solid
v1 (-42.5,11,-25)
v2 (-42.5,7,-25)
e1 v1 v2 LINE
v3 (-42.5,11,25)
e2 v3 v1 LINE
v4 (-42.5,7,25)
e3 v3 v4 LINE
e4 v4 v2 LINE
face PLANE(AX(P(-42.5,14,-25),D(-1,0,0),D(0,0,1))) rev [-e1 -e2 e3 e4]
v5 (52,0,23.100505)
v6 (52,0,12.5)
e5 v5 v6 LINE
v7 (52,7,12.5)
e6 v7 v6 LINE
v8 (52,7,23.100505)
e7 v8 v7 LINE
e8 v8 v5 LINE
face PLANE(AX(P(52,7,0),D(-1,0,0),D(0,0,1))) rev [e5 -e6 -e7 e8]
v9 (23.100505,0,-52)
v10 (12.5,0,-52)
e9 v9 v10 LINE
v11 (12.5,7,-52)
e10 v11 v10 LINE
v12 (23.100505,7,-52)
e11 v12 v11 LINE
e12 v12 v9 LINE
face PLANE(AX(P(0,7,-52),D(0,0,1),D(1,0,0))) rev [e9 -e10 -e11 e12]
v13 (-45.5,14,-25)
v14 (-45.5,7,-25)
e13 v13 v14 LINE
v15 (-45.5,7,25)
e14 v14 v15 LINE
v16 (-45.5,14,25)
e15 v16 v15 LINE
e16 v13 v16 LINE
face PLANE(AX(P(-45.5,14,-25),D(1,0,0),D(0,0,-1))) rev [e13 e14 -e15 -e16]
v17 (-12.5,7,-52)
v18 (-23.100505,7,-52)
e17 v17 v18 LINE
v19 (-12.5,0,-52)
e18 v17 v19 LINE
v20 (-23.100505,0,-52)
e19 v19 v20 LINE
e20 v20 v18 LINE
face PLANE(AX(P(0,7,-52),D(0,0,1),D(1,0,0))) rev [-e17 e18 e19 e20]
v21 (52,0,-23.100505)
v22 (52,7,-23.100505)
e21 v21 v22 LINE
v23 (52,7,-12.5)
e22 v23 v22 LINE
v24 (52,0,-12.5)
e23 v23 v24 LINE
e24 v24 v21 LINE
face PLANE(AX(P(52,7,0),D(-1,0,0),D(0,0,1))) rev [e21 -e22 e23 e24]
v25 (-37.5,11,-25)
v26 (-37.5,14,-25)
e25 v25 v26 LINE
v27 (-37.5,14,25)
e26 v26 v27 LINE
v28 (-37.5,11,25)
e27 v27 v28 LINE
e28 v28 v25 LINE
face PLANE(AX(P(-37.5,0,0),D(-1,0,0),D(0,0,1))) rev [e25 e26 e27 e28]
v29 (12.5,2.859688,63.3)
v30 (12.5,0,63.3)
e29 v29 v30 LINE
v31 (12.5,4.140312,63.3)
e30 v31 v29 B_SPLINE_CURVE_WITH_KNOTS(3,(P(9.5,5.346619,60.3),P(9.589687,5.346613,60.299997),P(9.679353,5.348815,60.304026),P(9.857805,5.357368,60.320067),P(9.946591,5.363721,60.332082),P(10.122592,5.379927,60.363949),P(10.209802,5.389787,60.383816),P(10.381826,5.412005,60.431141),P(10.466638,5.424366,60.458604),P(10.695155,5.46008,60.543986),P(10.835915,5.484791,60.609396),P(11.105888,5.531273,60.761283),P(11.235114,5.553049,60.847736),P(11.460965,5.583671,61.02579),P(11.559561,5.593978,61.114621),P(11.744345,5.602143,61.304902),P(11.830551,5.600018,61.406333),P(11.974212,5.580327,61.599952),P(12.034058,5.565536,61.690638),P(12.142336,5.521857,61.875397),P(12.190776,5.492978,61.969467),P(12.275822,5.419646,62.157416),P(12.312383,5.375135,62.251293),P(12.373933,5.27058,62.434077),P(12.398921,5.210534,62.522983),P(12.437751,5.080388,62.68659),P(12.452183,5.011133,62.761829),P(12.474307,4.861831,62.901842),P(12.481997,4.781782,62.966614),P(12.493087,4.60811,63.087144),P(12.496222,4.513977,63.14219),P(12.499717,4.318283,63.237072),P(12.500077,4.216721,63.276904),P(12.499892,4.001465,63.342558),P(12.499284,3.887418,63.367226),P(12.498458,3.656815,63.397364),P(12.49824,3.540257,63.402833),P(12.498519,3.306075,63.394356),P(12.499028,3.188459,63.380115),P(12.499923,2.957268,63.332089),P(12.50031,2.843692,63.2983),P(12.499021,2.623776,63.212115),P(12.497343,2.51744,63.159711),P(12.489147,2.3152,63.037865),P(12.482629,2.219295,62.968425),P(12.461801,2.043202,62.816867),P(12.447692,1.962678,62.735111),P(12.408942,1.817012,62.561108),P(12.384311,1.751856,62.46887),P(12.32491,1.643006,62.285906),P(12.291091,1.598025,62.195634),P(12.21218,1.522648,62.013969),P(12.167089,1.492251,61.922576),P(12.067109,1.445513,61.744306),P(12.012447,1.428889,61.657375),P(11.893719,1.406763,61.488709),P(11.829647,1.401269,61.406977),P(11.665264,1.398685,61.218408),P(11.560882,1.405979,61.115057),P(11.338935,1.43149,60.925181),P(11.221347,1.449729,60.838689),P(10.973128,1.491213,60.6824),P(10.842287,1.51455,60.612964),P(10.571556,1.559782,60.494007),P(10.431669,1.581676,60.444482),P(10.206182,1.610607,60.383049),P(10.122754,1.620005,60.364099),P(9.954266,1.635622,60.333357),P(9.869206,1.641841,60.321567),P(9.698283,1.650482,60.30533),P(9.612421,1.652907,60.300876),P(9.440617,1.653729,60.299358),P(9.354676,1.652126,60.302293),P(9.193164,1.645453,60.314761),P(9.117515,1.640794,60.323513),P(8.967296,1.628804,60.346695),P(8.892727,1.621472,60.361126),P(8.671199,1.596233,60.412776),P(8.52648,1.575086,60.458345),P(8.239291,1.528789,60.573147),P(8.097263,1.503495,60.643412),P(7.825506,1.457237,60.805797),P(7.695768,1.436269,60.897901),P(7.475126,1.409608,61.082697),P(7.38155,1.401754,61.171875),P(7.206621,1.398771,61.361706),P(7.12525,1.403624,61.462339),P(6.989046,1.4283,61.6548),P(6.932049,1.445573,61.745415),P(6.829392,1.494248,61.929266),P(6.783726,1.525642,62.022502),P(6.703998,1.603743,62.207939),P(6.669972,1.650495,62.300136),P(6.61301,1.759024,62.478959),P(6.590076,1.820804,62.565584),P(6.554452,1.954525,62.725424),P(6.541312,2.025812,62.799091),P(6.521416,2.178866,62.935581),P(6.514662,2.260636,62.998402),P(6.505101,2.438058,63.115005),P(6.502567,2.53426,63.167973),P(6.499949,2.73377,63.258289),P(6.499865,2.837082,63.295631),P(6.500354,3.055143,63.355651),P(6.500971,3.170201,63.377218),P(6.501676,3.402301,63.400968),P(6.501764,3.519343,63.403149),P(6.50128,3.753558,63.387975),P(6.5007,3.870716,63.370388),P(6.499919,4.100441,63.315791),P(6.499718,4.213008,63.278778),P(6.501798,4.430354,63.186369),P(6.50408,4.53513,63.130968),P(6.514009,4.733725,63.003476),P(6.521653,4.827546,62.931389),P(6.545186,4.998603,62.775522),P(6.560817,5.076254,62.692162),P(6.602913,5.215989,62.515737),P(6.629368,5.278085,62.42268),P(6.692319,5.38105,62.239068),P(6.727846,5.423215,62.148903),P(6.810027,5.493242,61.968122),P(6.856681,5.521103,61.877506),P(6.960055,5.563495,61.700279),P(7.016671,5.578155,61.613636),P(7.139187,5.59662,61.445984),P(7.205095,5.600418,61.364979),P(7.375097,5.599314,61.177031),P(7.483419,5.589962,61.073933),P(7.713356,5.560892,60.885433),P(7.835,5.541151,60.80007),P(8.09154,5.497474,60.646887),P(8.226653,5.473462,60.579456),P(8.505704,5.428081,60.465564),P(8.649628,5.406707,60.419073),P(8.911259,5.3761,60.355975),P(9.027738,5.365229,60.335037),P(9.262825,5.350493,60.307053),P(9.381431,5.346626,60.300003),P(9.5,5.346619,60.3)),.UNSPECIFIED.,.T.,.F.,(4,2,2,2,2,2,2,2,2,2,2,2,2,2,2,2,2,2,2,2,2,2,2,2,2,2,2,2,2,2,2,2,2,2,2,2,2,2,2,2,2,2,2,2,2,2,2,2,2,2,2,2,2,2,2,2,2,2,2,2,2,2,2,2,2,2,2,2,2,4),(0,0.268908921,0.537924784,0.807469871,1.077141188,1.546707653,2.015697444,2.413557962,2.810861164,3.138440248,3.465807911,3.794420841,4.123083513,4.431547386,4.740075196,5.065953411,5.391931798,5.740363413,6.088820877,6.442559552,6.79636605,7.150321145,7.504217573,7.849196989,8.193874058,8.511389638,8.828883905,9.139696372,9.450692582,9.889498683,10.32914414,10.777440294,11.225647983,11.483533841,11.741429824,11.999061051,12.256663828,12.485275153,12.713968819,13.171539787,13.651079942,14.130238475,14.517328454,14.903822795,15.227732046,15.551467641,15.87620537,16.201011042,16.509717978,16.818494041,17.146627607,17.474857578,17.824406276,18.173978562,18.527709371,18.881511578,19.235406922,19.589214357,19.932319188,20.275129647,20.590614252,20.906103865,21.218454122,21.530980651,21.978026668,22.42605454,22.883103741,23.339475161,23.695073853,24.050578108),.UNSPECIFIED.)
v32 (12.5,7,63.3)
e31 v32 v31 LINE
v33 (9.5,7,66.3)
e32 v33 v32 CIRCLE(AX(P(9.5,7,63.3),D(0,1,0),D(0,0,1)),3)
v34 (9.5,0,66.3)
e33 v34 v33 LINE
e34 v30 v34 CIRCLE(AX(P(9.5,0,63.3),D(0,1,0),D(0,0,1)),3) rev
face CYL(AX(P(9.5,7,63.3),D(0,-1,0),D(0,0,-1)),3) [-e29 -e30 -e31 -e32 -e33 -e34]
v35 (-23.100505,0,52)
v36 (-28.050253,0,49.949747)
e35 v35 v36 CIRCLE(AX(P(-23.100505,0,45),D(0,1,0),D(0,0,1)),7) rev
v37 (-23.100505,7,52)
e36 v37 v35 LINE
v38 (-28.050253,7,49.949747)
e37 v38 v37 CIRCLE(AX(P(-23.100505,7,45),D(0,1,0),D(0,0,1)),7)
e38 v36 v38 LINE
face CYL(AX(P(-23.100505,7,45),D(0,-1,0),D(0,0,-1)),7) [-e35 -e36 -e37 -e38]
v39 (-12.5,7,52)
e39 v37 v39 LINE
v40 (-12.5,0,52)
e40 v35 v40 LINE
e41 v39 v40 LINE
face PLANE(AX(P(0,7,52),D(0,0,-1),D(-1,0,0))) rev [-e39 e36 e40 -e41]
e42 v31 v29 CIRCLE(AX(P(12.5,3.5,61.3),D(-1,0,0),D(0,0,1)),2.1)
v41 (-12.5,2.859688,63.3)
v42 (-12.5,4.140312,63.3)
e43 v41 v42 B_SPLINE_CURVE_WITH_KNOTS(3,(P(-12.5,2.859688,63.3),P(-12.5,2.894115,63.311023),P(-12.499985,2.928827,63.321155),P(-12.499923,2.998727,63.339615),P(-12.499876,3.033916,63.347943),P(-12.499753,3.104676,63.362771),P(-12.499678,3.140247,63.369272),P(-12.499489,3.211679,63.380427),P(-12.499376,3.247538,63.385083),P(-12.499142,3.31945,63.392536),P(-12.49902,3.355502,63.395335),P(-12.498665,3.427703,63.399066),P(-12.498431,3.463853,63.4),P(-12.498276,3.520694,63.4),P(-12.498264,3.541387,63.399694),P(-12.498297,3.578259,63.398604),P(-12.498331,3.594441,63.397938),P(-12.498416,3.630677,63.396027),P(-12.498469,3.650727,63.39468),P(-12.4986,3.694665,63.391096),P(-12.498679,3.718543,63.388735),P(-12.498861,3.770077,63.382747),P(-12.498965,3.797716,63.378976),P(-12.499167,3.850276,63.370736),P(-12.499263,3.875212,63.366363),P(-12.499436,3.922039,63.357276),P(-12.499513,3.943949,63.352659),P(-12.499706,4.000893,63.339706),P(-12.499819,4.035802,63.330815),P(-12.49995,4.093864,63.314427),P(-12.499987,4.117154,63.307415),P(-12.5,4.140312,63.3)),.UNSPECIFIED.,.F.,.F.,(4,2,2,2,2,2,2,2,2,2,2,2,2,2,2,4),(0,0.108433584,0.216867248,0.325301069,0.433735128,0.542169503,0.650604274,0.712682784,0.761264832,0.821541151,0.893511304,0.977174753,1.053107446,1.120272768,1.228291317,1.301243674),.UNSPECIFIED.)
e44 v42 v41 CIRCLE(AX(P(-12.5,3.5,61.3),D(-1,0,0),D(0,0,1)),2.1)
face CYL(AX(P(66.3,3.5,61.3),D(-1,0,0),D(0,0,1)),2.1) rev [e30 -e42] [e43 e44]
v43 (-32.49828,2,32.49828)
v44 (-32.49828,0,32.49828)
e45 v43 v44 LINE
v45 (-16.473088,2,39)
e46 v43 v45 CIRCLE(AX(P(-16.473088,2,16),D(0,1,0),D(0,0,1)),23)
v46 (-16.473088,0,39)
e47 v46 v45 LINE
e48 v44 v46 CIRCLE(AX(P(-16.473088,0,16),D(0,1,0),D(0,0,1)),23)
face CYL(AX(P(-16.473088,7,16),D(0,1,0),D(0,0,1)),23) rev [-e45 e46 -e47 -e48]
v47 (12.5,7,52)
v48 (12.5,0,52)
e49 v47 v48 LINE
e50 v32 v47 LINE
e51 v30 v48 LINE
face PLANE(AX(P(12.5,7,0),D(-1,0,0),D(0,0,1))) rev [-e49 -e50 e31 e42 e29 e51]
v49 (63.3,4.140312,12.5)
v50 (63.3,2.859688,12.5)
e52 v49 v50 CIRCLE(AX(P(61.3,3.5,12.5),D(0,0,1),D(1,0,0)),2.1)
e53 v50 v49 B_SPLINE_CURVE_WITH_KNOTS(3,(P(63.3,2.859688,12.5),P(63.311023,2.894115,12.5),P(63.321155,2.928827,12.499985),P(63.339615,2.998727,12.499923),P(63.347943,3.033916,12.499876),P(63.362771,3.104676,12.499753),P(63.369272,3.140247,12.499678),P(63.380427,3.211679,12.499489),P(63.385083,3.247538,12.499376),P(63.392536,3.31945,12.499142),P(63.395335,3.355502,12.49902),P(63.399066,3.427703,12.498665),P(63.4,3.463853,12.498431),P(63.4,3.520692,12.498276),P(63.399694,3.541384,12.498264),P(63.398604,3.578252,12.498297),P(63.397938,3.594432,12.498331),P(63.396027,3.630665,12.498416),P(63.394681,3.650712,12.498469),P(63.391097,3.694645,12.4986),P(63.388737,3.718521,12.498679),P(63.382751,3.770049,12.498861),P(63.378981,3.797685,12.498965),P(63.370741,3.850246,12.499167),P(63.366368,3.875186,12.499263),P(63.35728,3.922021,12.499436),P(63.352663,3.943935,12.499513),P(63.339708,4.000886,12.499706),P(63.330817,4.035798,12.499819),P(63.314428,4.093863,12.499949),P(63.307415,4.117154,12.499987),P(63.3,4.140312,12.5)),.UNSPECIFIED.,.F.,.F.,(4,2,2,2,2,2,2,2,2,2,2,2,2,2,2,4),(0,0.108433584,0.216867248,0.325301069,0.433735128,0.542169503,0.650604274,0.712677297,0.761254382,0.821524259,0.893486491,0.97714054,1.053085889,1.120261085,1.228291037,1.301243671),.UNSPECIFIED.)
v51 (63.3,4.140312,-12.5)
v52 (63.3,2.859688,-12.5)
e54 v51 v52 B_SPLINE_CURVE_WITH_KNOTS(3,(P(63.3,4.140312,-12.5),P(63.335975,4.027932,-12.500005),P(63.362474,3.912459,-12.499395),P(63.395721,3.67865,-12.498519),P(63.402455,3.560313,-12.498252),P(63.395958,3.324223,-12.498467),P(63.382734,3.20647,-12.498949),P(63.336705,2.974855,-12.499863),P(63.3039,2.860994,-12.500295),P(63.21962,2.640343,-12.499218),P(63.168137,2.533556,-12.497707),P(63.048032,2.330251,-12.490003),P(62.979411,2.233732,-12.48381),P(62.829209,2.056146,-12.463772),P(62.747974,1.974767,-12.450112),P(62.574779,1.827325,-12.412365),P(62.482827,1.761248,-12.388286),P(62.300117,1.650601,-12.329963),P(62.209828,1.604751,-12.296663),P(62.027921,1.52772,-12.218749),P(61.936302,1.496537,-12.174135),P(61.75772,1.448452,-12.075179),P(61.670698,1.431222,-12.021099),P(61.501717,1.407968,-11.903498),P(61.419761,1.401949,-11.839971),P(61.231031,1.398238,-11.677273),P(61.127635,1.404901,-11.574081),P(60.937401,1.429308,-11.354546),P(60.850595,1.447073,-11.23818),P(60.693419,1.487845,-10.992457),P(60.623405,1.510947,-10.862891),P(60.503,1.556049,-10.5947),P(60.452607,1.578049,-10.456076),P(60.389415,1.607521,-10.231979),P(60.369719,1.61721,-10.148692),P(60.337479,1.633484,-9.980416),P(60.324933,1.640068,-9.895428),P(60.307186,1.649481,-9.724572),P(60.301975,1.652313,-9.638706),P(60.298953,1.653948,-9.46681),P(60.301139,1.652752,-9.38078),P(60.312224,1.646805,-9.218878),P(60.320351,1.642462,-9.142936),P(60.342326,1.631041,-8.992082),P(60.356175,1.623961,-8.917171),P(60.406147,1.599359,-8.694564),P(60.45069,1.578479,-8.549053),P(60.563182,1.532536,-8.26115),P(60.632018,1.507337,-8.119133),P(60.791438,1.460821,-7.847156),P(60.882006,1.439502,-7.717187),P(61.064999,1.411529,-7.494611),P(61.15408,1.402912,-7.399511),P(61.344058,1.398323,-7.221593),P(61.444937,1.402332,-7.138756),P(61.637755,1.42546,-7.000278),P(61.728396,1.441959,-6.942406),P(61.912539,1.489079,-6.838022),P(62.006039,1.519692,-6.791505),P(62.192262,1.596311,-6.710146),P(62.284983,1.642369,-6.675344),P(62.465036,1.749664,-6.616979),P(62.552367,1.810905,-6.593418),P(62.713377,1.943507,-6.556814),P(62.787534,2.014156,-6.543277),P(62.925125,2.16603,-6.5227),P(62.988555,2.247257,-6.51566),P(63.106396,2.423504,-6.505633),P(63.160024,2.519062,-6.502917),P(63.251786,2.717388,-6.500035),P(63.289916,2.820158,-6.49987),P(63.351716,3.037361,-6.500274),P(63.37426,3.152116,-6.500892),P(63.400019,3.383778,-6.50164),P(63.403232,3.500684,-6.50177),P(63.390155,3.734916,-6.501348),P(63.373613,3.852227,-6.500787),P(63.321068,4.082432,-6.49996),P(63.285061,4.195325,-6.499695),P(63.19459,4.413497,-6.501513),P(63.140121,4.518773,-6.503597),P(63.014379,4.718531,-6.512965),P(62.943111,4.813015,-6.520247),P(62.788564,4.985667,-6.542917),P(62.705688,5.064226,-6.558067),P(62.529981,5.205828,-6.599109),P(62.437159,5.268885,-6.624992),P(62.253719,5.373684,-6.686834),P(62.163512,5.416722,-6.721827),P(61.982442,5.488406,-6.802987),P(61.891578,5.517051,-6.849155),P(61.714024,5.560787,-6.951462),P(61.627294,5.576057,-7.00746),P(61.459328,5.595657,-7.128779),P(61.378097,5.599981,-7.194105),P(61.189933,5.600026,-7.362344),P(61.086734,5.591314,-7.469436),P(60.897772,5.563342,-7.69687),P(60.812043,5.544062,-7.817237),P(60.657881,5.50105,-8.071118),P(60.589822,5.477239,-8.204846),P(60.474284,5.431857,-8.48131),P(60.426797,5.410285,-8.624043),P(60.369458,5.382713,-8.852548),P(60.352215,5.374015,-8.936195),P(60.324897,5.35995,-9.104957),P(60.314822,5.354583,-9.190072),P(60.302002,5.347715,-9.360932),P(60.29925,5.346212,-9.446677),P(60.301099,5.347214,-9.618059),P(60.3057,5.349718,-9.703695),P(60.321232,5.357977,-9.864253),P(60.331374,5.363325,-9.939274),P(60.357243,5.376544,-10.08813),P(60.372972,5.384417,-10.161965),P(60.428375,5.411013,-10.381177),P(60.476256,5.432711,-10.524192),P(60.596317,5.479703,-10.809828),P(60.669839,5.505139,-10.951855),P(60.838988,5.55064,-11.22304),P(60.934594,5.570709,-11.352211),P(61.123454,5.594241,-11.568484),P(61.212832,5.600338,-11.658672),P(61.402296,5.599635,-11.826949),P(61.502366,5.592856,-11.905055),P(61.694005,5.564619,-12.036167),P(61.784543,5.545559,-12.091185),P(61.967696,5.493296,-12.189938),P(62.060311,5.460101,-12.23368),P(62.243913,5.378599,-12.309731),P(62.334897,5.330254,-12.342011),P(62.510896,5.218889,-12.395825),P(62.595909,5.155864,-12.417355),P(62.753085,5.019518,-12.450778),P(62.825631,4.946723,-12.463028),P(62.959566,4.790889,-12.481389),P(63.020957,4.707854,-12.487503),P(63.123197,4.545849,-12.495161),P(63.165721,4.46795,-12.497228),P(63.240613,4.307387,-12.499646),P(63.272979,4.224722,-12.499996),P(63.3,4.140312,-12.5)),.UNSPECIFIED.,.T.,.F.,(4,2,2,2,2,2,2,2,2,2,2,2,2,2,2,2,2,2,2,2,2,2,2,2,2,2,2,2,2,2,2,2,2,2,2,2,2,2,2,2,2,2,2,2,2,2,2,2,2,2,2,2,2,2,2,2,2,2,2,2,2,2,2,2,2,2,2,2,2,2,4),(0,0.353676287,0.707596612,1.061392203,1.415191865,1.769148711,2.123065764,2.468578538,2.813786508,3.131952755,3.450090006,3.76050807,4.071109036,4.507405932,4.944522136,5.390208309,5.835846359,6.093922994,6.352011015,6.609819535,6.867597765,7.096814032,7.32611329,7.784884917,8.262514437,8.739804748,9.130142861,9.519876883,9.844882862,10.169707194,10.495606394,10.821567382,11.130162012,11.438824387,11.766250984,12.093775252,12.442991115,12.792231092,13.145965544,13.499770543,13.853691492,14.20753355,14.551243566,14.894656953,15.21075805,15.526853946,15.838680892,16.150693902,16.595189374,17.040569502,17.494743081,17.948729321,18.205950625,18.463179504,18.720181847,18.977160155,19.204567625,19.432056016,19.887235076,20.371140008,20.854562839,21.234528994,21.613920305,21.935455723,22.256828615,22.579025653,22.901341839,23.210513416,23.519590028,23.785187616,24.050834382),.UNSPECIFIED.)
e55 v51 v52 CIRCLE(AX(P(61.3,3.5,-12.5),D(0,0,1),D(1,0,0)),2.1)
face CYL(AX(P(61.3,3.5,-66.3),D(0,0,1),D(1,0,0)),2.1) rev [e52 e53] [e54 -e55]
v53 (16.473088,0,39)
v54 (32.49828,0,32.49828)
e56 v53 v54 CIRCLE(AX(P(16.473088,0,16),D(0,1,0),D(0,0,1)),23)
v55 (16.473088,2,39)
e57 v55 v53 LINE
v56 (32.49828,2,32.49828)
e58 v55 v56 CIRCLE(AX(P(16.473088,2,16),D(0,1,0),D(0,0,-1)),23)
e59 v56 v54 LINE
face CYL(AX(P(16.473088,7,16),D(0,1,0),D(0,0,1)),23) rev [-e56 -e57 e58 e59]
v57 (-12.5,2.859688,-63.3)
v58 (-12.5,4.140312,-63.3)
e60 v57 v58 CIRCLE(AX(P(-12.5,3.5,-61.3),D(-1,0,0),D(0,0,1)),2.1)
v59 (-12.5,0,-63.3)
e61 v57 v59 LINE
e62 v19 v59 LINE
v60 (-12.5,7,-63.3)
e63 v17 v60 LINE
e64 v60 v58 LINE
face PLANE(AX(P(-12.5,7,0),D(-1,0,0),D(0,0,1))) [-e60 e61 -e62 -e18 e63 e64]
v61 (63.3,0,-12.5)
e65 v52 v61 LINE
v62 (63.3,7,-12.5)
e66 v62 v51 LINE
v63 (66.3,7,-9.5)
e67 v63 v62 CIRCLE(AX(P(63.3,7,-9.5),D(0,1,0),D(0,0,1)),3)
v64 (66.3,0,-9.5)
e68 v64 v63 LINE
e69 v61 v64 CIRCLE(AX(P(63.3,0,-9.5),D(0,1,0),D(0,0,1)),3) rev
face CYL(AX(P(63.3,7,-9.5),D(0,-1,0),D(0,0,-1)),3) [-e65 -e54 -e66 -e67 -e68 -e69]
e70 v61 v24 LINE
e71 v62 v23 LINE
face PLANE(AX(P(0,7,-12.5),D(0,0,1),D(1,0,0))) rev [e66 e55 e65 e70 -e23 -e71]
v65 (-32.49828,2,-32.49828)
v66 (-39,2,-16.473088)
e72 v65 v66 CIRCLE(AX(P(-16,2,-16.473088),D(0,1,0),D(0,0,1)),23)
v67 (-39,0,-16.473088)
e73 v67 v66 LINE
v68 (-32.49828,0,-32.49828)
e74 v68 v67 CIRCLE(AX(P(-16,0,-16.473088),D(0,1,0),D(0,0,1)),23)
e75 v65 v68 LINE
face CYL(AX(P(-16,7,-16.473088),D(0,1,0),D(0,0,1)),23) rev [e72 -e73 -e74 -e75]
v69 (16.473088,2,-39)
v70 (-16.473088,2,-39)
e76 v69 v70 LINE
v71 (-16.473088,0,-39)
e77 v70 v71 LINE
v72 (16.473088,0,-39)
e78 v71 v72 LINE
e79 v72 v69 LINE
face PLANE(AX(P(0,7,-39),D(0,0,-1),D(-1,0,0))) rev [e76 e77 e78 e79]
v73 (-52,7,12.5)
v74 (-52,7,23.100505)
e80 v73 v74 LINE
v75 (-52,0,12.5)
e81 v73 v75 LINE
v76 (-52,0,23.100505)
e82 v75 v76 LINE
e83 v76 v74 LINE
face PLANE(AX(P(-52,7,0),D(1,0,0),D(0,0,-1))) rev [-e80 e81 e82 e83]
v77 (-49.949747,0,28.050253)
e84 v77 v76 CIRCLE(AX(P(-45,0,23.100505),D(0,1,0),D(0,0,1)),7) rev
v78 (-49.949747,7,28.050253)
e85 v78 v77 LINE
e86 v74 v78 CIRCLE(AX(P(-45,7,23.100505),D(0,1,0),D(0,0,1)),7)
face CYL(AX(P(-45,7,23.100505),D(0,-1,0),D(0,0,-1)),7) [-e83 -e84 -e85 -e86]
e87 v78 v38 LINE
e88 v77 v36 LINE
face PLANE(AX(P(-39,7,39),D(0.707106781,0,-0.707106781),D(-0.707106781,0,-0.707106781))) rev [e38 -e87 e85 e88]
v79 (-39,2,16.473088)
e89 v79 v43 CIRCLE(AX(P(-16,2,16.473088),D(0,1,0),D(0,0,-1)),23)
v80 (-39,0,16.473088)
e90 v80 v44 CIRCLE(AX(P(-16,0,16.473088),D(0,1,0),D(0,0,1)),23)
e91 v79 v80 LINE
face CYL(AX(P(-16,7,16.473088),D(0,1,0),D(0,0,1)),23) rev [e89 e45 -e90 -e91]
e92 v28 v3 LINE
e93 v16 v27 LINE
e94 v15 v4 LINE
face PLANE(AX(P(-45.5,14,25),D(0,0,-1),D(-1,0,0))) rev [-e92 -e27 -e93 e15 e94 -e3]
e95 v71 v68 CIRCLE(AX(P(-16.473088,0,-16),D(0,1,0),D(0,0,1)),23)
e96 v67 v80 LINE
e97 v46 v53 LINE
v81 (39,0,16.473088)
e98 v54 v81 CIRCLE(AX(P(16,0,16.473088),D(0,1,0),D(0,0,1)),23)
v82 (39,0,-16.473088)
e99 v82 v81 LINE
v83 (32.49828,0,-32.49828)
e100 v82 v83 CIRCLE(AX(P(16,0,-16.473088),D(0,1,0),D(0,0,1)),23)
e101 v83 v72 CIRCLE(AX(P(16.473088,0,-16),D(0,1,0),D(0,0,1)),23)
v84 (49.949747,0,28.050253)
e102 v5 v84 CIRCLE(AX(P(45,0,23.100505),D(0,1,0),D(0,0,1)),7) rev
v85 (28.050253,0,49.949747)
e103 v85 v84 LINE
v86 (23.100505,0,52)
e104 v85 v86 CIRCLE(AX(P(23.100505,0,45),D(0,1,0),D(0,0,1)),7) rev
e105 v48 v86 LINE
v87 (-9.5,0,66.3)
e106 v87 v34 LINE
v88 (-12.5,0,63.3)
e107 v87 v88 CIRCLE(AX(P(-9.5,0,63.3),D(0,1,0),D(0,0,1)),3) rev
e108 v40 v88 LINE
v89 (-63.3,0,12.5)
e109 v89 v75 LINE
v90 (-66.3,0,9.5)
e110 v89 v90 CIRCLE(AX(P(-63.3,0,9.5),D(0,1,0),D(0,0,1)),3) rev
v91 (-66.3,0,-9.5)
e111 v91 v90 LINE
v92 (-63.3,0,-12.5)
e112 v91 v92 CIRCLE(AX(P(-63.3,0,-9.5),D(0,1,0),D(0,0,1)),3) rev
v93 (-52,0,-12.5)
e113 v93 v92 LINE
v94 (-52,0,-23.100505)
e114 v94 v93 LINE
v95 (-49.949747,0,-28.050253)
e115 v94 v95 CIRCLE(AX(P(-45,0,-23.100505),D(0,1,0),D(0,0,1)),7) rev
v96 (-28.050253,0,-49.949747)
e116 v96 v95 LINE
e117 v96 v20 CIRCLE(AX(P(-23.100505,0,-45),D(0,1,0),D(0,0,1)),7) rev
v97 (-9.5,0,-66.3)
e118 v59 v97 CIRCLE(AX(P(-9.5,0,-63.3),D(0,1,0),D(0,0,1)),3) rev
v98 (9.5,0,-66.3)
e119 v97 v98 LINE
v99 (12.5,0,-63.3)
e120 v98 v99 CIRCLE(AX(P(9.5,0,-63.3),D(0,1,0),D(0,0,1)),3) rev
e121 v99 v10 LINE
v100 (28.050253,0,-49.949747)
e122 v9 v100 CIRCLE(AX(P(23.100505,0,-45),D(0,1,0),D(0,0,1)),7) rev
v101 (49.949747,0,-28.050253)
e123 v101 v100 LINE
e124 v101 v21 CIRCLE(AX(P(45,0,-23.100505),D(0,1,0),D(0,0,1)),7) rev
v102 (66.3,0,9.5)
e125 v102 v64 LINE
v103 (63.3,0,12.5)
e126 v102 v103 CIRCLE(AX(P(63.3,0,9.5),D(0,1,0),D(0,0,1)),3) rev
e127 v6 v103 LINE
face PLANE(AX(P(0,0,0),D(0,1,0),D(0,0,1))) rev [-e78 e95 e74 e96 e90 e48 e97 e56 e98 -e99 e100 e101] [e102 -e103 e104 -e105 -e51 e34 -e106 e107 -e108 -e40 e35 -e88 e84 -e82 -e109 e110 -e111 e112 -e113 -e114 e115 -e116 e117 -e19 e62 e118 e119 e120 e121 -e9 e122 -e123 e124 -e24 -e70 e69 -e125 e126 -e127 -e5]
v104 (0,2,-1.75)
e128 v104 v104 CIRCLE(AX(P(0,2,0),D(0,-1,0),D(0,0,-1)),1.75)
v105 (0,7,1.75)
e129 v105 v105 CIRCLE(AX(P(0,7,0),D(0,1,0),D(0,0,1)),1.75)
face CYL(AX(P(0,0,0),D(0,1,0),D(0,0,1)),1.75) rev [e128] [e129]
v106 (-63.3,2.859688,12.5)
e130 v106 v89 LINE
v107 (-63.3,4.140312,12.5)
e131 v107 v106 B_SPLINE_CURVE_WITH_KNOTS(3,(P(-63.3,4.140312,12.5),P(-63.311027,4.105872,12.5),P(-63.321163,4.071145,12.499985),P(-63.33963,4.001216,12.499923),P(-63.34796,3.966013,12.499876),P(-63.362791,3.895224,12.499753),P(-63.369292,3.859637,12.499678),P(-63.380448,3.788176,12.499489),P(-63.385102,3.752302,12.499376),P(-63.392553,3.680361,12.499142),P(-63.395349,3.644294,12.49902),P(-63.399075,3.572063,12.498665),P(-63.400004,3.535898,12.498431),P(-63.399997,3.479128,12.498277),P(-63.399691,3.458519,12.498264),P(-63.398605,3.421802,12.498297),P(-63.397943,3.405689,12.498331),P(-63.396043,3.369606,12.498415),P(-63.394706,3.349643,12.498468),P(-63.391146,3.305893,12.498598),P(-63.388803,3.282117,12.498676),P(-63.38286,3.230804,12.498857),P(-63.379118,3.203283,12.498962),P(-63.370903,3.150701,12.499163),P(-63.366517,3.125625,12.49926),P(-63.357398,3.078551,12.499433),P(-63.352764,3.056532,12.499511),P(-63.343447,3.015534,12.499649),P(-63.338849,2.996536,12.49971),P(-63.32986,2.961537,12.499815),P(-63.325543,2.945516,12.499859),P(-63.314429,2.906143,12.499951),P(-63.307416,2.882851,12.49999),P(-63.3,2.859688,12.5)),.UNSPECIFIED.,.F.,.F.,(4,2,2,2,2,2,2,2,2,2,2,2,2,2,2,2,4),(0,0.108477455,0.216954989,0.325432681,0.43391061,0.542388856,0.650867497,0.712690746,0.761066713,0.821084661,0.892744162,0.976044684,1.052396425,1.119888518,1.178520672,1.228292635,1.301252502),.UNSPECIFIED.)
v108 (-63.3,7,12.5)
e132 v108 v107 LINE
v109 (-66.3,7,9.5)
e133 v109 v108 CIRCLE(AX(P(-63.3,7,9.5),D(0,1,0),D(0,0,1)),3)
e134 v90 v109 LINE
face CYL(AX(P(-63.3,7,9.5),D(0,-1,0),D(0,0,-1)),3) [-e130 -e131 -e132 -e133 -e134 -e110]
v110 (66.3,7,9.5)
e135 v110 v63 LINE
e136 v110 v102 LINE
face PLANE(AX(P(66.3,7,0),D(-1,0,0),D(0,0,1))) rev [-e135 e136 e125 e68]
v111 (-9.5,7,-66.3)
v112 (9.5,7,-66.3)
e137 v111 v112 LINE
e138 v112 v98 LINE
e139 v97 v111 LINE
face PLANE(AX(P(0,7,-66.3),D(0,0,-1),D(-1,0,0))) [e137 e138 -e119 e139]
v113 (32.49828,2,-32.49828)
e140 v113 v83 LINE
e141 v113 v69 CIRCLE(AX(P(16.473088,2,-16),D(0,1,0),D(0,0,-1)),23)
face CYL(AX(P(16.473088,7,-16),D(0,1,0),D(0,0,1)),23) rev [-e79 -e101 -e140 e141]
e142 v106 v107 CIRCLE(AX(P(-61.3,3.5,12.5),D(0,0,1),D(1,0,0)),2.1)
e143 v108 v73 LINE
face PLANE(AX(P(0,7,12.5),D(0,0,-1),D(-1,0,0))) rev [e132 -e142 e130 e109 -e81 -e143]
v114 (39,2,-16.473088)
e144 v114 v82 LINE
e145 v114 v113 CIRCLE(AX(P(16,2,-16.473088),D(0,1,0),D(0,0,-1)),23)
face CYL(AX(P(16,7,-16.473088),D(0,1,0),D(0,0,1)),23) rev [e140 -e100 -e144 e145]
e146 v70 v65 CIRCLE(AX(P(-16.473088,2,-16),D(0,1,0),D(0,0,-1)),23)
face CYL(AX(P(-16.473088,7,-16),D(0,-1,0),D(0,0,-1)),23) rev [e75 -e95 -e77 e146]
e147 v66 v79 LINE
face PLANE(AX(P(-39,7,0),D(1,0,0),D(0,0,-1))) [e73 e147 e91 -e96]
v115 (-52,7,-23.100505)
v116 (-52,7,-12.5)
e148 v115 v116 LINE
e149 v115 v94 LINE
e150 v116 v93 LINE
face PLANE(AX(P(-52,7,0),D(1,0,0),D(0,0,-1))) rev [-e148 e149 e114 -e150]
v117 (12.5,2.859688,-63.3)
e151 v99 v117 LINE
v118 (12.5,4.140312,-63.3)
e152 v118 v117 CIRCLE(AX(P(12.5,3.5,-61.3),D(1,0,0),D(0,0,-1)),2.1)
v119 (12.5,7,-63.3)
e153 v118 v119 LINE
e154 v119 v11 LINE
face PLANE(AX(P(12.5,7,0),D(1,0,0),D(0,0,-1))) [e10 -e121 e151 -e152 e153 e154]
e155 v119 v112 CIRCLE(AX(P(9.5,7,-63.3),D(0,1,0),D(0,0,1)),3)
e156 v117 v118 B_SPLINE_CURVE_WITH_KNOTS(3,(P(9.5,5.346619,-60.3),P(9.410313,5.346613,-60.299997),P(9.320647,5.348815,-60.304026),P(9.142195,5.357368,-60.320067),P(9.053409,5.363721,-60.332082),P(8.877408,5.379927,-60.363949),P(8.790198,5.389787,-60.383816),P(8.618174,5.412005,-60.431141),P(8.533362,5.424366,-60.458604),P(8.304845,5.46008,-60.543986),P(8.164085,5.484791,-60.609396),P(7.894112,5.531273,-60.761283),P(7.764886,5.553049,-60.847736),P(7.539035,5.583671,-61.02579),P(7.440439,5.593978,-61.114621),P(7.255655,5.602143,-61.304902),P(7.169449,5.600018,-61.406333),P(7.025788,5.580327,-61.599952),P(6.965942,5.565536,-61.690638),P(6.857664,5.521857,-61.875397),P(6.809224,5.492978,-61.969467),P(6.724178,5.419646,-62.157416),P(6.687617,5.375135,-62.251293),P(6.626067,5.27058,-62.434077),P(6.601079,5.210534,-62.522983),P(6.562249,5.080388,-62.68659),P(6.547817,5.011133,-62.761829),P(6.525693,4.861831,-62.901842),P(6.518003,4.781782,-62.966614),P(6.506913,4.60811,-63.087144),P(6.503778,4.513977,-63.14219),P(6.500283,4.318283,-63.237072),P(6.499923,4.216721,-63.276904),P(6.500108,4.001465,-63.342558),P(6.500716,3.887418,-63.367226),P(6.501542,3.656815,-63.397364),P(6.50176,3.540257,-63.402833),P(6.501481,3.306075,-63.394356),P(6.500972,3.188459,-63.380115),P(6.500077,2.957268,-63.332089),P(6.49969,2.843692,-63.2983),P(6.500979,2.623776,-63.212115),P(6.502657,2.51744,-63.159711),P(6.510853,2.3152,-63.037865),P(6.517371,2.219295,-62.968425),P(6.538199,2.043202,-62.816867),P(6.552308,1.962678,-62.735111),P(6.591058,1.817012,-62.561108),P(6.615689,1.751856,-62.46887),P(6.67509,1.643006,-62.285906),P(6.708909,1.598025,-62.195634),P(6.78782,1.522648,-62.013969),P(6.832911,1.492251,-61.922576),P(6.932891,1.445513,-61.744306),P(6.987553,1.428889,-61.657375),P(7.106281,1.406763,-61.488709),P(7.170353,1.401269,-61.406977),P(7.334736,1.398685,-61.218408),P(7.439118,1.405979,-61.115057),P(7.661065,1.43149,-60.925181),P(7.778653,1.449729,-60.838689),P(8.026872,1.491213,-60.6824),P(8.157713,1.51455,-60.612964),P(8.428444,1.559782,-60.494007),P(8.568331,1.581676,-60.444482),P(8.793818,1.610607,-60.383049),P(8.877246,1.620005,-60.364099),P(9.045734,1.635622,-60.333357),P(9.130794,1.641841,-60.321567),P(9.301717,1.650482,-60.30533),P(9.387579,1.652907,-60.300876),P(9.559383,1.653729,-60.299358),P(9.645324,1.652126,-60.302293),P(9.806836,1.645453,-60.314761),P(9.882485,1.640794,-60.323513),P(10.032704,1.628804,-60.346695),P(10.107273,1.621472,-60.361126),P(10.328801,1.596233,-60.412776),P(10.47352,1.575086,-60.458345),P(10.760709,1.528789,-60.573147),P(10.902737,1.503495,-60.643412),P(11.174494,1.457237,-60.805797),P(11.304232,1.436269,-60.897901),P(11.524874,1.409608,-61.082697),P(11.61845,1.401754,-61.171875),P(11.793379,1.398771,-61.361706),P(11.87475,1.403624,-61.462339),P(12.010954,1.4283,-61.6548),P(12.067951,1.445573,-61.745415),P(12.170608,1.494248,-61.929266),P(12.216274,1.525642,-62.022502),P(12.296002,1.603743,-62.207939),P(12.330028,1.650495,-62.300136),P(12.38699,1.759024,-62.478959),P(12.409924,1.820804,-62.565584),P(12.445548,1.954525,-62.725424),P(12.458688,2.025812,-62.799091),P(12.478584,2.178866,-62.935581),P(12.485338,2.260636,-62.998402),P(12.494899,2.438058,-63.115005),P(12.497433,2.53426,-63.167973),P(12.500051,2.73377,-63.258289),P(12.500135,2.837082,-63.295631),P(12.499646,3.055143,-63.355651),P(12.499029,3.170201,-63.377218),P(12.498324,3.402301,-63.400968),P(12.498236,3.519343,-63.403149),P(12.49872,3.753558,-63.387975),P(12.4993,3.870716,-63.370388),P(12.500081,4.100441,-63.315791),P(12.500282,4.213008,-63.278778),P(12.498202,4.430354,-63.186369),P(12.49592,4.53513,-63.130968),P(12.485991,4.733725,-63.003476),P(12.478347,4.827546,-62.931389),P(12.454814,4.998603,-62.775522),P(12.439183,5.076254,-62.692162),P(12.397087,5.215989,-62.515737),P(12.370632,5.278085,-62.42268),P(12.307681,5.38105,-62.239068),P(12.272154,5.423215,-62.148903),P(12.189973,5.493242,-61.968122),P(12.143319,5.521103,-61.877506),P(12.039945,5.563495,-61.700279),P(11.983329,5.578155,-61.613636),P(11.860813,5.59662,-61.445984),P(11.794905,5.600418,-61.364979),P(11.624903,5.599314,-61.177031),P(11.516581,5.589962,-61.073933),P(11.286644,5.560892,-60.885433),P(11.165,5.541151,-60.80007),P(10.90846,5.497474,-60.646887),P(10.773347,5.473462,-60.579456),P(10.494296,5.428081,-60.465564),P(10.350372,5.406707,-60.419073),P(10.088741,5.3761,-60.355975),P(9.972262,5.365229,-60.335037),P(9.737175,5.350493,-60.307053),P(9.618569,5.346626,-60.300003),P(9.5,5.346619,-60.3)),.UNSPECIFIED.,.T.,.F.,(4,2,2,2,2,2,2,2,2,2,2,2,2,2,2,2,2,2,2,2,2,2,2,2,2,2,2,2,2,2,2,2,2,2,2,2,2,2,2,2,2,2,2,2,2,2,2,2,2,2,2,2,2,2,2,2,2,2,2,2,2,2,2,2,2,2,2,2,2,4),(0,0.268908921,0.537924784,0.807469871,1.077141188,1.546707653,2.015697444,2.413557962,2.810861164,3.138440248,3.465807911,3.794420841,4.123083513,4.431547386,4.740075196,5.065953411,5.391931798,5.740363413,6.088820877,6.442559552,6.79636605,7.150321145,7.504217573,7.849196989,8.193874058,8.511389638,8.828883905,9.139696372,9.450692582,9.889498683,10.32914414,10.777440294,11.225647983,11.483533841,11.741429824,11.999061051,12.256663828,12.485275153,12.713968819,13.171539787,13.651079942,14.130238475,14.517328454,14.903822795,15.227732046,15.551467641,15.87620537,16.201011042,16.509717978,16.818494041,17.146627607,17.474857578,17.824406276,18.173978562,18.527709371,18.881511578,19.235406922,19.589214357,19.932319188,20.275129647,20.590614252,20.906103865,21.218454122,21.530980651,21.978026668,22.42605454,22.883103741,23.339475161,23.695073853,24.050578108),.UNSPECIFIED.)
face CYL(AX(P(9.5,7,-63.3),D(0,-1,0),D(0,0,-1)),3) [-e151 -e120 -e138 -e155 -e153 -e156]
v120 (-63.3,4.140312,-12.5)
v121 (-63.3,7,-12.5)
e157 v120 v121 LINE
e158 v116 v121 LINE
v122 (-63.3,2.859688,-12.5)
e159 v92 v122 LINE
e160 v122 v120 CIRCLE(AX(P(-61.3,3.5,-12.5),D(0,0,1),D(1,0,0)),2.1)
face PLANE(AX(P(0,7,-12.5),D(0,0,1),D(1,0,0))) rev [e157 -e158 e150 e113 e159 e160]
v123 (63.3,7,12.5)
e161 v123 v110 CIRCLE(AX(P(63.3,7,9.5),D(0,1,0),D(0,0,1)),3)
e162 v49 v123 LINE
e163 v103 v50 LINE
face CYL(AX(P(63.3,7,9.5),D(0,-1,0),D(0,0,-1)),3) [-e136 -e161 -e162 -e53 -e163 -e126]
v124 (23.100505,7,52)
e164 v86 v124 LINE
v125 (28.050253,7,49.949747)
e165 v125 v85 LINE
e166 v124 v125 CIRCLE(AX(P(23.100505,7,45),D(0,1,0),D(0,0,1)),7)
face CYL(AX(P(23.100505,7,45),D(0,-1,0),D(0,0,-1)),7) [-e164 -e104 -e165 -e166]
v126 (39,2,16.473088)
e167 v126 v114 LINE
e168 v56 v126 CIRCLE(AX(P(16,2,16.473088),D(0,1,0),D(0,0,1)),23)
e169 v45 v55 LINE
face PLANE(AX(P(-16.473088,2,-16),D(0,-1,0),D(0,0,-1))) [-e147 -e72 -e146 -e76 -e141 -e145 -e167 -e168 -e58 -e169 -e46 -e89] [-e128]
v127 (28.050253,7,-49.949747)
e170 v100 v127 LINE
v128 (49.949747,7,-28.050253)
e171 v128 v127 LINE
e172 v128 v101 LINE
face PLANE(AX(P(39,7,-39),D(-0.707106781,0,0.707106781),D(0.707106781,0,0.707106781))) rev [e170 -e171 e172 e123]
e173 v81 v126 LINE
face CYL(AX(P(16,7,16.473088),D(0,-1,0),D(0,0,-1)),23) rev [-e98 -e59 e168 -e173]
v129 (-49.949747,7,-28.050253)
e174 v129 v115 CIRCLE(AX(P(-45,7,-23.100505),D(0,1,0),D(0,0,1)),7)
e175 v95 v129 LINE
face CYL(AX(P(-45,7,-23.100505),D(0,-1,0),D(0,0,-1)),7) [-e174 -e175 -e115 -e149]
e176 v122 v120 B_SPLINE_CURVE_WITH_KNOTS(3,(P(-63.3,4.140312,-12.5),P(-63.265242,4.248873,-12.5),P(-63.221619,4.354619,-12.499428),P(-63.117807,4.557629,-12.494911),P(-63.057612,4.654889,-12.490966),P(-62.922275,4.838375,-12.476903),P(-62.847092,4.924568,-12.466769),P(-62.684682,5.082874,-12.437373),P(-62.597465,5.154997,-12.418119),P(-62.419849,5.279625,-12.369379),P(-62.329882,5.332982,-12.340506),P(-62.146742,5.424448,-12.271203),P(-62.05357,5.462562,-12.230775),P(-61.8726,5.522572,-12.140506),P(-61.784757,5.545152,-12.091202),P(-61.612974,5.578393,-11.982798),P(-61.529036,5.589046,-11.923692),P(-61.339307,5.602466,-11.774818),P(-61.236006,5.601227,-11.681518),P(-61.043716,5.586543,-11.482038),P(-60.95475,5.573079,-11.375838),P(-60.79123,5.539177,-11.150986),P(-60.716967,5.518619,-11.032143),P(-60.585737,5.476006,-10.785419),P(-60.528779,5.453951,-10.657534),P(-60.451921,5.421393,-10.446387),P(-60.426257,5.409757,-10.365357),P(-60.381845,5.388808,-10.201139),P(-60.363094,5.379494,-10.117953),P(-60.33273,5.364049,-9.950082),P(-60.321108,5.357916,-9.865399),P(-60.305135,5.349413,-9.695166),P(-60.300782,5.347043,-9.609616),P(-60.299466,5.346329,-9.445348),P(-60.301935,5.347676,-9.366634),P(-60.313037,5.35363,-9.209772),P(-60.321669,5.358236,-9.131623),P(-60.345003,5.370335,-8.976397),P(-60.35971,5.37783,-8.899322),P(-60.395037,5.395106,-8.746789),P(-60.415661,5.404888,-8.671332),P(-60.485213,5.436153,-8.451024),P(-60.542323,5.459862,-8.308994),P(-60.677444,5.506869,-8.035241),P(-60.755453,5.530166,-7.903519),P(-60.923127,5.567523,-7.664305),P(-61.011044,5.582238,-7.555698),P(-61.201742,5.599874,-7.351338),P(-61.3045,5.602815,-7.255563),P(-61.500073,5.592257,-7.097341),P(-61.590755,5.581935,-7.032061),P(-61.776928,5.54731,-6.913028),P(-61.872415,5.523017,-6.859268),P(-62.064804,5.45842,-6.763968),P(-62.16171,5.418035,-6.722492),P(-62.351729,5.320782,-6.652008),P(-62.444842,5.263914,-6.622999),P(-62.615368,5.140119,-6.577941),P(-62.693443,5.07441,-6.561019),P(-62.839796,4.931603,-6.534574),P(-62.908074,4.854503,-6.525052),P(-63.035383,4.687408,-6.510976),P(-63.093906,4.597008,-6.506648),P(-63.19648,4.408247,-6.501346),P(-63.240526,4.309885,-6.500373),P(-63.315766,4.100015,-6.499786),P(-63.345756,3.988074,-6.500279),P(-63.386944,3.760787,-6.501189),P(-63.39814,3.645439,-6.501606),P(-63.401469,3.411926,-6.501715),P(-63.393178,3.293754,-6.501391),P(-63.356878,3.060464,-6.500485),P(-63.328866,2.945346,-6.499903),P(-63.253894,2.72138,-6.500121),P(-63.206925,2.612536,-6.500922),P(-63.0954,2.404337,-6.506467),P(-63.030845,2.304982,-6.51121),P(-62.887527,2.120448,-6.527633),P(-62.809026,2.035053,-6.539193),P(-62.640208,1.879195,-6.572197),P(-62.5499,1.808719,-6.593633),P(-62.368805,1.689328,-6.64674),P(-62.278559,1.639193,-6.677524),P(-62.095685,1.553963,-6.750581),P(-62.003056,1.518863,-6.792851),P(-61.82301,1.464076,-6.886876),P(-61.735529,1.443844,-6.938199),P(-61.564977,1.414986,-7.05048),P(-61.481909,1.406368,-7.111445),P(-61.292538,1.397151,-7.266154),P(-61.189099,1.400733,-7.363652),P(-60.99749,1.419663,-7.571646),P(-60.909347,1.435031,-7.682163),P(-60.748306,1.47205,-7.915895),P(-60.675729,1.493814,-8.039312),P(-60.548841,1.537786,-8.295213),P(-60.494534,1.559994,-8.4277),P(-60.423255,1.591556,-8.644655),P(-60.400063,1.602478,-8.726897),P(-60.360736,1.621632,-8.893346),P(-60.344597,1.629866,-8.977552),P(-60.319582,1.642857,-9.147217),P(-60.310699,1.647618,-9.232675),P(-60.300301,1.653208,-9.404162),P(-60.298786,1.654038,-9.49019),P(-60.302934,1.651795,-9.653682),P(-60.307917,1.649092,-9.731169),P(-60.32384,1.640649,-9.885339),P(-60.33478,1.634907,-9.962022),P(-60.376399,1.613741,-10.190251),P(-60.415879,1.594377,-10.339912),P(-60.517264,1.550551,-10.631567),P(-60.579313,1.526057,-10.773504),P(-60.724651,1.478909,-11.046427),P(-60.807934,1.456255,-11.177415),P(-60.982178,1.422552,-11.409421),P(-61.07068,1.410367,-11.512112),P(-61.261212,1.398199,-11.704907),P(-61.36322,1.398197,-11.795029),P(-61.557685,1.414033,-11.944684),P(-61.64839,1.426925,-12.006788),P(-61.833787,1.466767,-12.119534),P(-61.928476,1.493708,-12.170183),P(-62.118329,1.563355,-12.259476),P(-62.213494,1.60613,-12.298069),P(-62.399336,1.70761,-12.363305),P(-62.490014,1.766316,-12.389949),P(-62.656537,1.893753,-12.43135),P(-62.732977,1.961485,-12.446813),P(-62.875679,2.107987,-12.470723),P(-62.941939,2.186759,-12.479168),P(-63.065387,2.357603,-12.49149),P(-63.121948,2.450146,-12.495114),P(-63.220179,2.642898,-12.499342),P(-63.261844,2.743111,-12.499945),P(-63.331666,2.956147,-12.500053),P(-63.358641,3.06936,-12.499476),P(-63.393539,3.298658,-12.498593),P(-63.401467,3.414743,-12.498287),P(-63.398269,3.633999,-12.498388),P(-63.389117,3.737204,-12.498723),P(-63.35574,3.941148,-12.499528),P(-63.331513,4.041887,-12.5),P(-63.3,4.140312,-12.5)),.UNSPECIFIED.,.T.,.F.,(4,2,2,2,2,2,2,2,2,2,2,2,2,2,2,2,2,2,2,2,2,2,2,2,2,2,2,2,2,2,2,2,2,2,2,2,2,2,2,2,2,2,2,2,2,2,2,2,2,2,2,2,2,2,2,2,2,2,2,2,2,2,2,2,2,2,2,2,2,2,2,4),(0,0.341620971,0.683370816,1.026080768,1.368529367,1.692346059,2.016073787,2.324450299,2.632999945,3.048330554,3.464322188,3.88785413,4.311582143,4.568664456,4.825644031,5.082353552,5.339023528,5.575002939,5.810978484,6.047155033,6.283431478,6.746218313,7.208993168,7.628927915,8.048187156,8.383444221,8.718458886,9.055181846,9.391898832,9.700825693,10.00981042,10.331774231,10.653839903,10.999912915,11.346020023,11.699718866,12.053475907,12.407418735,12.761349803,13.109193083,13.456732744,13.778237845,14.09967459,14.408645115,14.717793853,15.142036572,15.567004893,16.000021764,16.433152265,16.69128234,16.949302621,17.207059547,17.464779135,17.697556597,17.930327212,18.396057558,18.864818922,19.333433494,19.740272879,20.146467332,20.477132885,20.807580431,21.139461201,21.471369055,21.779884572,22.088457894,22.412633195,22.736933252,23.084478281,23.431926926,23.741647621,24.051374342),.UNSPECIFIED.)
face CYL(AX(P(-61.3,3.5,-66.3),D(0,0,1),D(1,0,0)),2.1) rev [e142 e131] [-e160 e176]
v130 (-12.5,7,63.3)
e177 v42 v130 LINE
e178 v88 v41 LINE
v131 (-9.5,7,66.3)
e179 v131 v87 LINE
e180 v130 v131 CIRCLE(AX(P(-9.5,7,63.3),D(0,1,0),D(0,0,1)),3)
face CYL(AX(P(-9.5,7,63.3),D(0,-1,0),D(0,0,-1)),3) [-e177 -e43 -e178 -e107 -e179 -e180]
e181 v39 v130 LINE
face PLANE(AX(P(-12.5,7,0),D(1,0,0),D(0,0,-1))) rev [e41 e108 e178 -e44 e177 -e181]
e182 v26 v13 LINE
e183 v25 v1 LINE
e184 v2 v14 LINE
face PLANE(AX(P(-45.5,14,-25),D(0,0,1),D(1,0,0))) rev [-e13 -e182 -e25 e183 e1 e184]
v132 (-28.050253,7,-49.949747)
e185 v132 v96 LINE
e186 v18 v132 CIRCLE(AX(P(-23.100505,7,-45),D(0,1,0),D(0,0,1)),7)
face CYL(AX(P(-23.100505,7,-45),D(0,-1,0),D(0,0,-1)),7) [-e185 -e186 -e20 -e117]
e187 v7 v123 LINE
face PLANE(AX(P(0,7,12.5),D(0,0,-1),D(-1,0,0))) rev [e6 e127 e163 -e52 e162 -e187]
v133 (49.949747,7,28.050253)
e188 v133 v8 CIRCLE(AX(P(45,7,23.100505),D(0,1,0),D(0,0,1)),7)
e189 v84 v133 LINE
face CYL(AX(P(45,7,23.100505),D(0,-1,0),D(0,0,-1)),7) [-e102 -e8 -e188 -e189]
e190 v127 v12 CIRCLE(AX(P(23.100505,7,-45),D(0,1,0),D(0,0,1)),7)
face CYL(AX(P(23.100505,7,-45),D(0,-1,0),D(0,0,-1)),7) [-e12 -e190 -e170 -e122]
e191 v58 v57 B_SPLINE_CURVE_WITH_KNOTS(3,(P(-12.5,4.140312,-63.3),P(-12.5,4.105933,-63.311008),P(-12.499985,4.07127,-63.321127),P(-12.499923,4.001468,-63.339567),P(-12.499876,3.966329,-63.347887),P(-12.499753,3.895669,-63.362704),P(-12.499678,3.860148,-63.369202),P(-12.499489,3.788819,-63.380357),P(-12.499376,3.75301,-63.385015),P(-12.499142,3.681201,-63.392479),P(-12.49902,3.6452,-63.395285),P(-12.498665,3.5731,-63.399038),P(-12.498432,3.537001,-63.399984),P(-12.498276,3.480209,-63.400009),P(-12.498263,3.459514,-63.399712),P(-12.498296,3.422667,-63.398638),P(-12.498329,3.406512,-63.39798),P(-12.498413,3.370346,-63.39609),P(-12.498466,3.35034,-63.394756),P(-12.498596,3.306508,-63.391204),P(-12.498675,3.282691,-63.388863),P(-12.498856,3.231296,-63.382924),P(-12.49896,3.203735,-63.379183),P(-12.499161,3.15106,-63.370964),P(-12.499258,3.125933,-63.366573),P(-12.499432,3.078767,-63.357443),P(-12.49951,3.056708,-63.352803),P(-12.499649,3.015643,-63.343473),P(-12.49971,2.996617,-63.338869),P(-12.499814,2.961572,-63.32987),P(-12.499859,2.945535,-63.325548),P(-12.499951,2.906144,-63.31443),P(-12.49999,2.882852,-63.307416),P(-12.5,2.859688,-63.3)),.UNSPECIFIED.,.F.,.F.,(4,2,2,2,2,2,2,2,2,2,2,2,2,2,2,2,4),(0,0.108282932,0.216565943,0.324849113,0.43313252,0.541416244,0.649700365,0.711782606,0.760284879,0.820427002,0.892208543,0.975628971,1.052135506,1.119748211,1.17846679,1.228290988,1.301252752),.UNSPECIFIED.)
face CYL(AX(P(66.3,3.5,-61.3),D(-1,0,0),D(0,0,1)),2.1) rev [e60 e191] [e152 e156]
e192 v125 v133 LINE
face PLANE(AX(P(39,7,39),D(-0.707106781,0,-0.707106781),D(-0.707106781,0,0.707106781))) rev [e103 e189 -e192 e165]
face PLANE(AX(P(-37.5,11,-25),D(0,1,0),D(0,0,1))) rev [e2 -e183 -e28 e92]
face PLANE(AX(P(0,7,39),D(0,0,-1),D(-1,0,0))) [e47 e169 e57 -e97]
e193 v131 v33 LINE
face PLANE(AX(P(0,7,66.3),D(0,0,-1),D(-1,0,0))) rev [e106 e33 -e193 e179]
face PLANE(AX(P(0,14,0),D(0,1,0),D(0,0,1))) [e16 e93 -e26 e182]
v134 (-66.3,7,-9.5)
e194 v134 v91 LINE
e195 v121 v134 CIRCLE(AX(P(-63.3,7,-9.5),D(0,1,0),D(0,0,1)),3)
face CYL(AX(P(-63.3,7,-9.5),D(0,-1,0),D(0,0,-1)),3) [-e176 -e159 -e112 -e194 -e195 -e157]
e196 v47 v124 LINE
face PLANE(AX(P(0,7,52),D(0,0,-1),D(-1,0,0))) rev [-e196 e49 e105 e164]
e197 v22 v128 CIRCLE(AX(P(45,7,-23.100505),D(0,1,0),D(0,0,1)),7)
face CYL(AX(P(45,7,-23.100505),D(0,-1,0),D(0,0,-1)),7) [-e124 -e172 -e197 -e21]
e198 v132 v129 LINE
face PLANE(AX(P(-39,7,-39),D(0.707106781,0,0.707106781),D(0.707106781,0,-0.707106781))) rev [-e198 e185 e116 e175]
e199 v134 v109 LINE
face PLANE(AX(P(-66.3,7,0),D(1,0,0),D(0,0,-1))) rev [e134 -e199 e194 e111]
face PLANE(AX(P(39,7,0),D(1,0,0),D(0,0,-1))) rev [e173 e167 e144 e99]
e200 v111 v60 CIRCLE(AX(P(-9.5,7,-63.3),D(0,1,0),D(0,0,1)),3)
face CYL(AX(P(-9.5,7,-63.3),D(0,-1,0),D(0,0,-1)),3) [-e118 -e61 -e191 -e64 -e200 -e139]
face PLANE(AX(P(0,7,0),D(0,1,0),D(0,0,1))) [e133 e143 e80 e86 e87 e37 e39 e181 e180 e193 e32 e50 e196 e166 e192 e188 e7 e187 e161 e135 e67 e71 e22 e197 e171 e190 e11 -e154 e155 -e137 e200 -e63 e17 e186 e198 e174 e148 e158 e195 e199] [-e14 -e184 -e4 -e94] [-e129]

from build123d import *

# Parameters (mm, degrees)
SKETCH_1_W          = 14.3
SKETCH_1_H          = 25
SKETCH_1_W_2        = 25
SKETCH_1_H_2        = 14.3
EXTRUDE_1_DEPTH     = 7
FILLET_1_R          = 3
FILLET_2_R          = 7
FILLET_3_R          = 23
EXTRUDE_START       = -5
EXTRUDE_2_DEPTH     = 5
SKETCH_7_R          = 1.75
CUT_EXTRUDE_5_DEPTH = 95.023294986
SKETCH_9_W          = 3
SKETCH_9_H          = 50
EXTRUDE_3_DEPTH     = 7
SKETCH_10_W         = 50
SKETCH_10_H         = 3
EXTRUDE_4_DEPTH     = 5
SKETCH_11_R         = 2.1
CUT_EXTRUDE_6_DEPTH = 104.928485027
SKETCH_12_R         = 2.1
CUT_EXTRUDE_7_DEPTH = 104.928485103


with BuildPart() as part:
    # 스케치1 → 보스-돌출1 (new body)
    with BuildSketch(Plane(origin=(0, 0, 0), x_dir=(1, 0, 0), z_dir=(0, 1, 0))):
        Polygon((-26, 52), (-39, 39), (-26, 39), (26, 39), (39, 39), (26, 52), (12.5, 52), (-12.5, 52), align=None)
        Polygon((-26, 39), (-39, 39), (-39, 26), align=None)
        Polygon((-39, 26), (-39, 39), (-52, 26), (-52, 12.5), (-52, -12.5), (-52, -26), (-39, -39), (-39, -26), align=None)
        with Locations((-59.15, 0)):
            Rectangle(SKETCH_1_W, SKETCH_1_H)
        with Locations((0, 59.15)):
            Rectangle(SKETCH_1_W_2, SKETCH_1_H_2)
        Polygon((39, 39), (26, 39), (39, 26), align=None)
        Polygon((52, 26), (39, 39), (39, 26), (39, -26), (39, -39), (52, -26), (52, -12.5), (52, 12.5), align=None)
        with Locations((59.15, 0)):
            Rectangle(SKETCH_1_W, SKETCH_1_H)
        Polygon((39, -39), (39, -26), (26, -39), align=None)
        Polygon((-26, -39), (-39, -39), (-26, -52), (-12.5, -52), (12.5, -52), (26, -52), (39, -39), (26, -39), align=None)
        Polygon((-26, -39), (-39, -26), (-39, -39), align=None)
        with Locations((0, -59.15)):
            Rectangle(SKETCH_1_W_2, SKETCH_1_H_2)
    extrude(amount=EXTRUDE_1_DEPTH)

    # 필렛1
    fillet_1_edges = [part.edges().sort_by_distance(p)[0] for p in [
        (12.5, 3.5, 66.3),
        (-12.5, 3.5, 66.3),
        (-66.3, 3.5, 12.5),
        (-66.3, 3.5, -12.5),
        (-12.5, 3.5, -66.3),
        (12.5, 3.5, -66.3),
        (66.3, 3.5, -12.5),
        (66.3, 3.5, 12.5),
    ]]
    fillet(fillet_1_edges, radius=FILLET_1_R)

    # 필렛2
    fillet_2_edges = [part.edges().sort_by_distance(p)[0] for p in [
        (-26, 3.5, 52),
        (-52, 3.5, 26),
        (-52, 3.5, -26),
        (-26, 3.5, -52),
        (26, 3.5, -52),
        (52, 3.5, -26),
        (52, 3.5, 26),
        (26, 3.5, 52),
    ]]
    fillet(fillet_2_edges, radius=FILLET_2_R)

    # 필렛3
    # the kernel refuses this fillet: 23 mm, written as the material it adds along each edge
    with BuildSketch(Plane(origin=(-39, 0, 26), x_dir=(0, 0, -1), z_dir=(0, 1, 0))) as fillet_3_piece_1:
        with BuildLine():
            CenterArc((FILLET_3_R * 0.414213562373, -FILLET_3_R), FILLET_3_R, 90, 45)
            Line((-FILLET_3_R * 0.292893218813, -FILLET_3_R * 0.292893218813), (0, 0))
            Line((0, 0), (FILLET_3_R * 0.414213562373, 0))
        make_face()
    extrude(amount=7)
    with BuildSketch(Plane(origin=(-26, 0, 39), x_dir=(1, 0, 0), z_dir=(0, 1, 0)), Plane(origin=(26, 0, 39), x_dir=(0.7071067811865479, 0, -0.7071067811865471), z_dir=(0, 1, 0)), Plane(origin=(39, 0, 26), x_dir=(0, 0, -1), z_dir=(0, 1, 0)), Plane(origin=(39, 0, -26), x_dir=(-0.7071067811865476, 0, -0.7071067811865476), z_dir=(0, 1, 0)), Plane(origin=(26, 0, -39), x_dir=(-1, 0, 0), z_dir=(0, 1, 0)), Plane(origin=(-26, 0, -39), x_dir=(-0.7071067811865471, 0, 0.7071067811865479), z_dir=(0, 1, 0)), Plane(origin=(-39, 0, -26), x_dir=(0, 0, 1), z_dir=(0, 1, 0))) as fillet_3_piece_2:
        with BuildLine():
            CenterArc((FILLET_3_R * 0.414213562373, FILLET_3_R), FILLET_3_R, 225, 45)
            Line((-FILLET_3_R * 0.292893218813, FILLET_3_R * 0.292893218813), (0, 0))
            Line((0, 0), (FILLET_3_R * 0.414213562373, 0))
        make_face()
    extrude(amount=7)

    # 스케치6 → 보스-돌출2 (add)
    with BuildSketch(Plane(origin=(0, 7, 0), x_dir=(1, 0, 0), z_dir=(0, 1, 0)).offset(EXTRUDE_START)):
        with BuildLine():
            Line((16.473088065, 39), (-16.473088065, 39))
            ThreePointArc((-16.473088065, 39), (-25.120040329, 37.312677367), (-32.4982797, 32.4982797))
            ThreePointArc((-32.4982797, 32.4982797), (-37.312677367, 25.120040329), (-39, 16.473088065))
            Line((-39, 16.473088065), (-39, -16.473088065))
            ThreePointArc((-39, -16.473088065), (-37.312677367, -25.120040329), (-32.4982797, -32.4982797))
            ThreePointArc((-32.4982797, -32.4982797), (-25.120040329, -37.312677367), (-16.473088065, -39))
            Line((-16.473088065, -39), (16.473088065, -39))
            ThreePointArc((16.473088065, -39), (25.120040329, -37.312677367), (32.4982797, -32.4982797))
            ThreePointArc((32.4982797, -32.4982797), (37.312677367, -25.120040329), (39, -16.473088065))
            Line((39, -16.473088065), (39, 16.473088065))
            ThreePointArc((39, 16.473088065), (37.312677367, 25.120040329), (32.4982797, 32.4982797))
            ThreePointArc((32.4982797, 32.4982797), (25.120040329, 37.312677367), (16.473088065, 39))
        make_face()
    extrude(amount=EXTRUDE_2_DEPTH)

    # 스케치7 → 컷-돌출5 (cut, through all)
    with BuildSketch(Plane(origin=(0, 7, 0), x_dir=(1, 0, 0), z_dir=(0, 1, 0))):
        with Locations(Location((0, 0, 0), (0, 0, 270))):
            Circle(SKETCH_7_R)
    extrude(amount=-CUT_EXTRUDE_5_DEPTH, mode=Mode.SUBTRACT)

    # 스케치9 → 보스-돌출3 (add)
    with BuildSketch(Plane(origin=(0, 7, 0), x_dir=(1, 0, 0), z_dir=(0, 1, 0))):
        with Locations((-44, 0)):
            Rectangle(SKETCH_9_W, SKETCH_9_H)
    extrude(amount=EXTRUDE_3_DEPTH)

    # 스케치10 → 보스-돌출4 (add)
    with BuildSketch(Plane(origin=(-42.5, 0, 0), x_dir=(0, 0, -1), z_dir=(1, 0, 0))):
        with Locations((0, 12.5)):
            Rectangle(SKETCH_10_W, SKETCH_10_H)
    extrude(amount=EXTRUDE_4_DEPTH)

    # 스케치11 → 컷-돌출6 (cut, through all)
    with BuildSketch(Plane.XY.offset(12.5)):
        with Locations(Location((-61.3, 3.5, 0), (0, 0, 197.752790162))):
            Circle(SKETCH_11_R)
        with Locations(Location((61.3, 3.5, 0), (0, 0, 17.752790162))):
            Circle(SKETCH_11_R)
    extrude(amount=-CUT_EXTRUDE_6_DEPTH, mode=Mode.SUBTRACT)

    # 스케치12 → 컷-돌출7 (cut, through all)
    with BuildSketch(Plane.ZY.offset(12.5)):
        with Locations(Location((-61.3, 3.5, 0), (0, 0, 162.247209838))):
            Circle(SKETCH_12_R)
        with Locations(Location((61.3, 3.5, 0), (0, 0, 17.752790162))):
            Circle(SKETCH_12_R)
    extrude(amount=-CUT_EXTRUDE_7_DEPTH, mode=Mode.SUBTRACT)


solid = part.part
